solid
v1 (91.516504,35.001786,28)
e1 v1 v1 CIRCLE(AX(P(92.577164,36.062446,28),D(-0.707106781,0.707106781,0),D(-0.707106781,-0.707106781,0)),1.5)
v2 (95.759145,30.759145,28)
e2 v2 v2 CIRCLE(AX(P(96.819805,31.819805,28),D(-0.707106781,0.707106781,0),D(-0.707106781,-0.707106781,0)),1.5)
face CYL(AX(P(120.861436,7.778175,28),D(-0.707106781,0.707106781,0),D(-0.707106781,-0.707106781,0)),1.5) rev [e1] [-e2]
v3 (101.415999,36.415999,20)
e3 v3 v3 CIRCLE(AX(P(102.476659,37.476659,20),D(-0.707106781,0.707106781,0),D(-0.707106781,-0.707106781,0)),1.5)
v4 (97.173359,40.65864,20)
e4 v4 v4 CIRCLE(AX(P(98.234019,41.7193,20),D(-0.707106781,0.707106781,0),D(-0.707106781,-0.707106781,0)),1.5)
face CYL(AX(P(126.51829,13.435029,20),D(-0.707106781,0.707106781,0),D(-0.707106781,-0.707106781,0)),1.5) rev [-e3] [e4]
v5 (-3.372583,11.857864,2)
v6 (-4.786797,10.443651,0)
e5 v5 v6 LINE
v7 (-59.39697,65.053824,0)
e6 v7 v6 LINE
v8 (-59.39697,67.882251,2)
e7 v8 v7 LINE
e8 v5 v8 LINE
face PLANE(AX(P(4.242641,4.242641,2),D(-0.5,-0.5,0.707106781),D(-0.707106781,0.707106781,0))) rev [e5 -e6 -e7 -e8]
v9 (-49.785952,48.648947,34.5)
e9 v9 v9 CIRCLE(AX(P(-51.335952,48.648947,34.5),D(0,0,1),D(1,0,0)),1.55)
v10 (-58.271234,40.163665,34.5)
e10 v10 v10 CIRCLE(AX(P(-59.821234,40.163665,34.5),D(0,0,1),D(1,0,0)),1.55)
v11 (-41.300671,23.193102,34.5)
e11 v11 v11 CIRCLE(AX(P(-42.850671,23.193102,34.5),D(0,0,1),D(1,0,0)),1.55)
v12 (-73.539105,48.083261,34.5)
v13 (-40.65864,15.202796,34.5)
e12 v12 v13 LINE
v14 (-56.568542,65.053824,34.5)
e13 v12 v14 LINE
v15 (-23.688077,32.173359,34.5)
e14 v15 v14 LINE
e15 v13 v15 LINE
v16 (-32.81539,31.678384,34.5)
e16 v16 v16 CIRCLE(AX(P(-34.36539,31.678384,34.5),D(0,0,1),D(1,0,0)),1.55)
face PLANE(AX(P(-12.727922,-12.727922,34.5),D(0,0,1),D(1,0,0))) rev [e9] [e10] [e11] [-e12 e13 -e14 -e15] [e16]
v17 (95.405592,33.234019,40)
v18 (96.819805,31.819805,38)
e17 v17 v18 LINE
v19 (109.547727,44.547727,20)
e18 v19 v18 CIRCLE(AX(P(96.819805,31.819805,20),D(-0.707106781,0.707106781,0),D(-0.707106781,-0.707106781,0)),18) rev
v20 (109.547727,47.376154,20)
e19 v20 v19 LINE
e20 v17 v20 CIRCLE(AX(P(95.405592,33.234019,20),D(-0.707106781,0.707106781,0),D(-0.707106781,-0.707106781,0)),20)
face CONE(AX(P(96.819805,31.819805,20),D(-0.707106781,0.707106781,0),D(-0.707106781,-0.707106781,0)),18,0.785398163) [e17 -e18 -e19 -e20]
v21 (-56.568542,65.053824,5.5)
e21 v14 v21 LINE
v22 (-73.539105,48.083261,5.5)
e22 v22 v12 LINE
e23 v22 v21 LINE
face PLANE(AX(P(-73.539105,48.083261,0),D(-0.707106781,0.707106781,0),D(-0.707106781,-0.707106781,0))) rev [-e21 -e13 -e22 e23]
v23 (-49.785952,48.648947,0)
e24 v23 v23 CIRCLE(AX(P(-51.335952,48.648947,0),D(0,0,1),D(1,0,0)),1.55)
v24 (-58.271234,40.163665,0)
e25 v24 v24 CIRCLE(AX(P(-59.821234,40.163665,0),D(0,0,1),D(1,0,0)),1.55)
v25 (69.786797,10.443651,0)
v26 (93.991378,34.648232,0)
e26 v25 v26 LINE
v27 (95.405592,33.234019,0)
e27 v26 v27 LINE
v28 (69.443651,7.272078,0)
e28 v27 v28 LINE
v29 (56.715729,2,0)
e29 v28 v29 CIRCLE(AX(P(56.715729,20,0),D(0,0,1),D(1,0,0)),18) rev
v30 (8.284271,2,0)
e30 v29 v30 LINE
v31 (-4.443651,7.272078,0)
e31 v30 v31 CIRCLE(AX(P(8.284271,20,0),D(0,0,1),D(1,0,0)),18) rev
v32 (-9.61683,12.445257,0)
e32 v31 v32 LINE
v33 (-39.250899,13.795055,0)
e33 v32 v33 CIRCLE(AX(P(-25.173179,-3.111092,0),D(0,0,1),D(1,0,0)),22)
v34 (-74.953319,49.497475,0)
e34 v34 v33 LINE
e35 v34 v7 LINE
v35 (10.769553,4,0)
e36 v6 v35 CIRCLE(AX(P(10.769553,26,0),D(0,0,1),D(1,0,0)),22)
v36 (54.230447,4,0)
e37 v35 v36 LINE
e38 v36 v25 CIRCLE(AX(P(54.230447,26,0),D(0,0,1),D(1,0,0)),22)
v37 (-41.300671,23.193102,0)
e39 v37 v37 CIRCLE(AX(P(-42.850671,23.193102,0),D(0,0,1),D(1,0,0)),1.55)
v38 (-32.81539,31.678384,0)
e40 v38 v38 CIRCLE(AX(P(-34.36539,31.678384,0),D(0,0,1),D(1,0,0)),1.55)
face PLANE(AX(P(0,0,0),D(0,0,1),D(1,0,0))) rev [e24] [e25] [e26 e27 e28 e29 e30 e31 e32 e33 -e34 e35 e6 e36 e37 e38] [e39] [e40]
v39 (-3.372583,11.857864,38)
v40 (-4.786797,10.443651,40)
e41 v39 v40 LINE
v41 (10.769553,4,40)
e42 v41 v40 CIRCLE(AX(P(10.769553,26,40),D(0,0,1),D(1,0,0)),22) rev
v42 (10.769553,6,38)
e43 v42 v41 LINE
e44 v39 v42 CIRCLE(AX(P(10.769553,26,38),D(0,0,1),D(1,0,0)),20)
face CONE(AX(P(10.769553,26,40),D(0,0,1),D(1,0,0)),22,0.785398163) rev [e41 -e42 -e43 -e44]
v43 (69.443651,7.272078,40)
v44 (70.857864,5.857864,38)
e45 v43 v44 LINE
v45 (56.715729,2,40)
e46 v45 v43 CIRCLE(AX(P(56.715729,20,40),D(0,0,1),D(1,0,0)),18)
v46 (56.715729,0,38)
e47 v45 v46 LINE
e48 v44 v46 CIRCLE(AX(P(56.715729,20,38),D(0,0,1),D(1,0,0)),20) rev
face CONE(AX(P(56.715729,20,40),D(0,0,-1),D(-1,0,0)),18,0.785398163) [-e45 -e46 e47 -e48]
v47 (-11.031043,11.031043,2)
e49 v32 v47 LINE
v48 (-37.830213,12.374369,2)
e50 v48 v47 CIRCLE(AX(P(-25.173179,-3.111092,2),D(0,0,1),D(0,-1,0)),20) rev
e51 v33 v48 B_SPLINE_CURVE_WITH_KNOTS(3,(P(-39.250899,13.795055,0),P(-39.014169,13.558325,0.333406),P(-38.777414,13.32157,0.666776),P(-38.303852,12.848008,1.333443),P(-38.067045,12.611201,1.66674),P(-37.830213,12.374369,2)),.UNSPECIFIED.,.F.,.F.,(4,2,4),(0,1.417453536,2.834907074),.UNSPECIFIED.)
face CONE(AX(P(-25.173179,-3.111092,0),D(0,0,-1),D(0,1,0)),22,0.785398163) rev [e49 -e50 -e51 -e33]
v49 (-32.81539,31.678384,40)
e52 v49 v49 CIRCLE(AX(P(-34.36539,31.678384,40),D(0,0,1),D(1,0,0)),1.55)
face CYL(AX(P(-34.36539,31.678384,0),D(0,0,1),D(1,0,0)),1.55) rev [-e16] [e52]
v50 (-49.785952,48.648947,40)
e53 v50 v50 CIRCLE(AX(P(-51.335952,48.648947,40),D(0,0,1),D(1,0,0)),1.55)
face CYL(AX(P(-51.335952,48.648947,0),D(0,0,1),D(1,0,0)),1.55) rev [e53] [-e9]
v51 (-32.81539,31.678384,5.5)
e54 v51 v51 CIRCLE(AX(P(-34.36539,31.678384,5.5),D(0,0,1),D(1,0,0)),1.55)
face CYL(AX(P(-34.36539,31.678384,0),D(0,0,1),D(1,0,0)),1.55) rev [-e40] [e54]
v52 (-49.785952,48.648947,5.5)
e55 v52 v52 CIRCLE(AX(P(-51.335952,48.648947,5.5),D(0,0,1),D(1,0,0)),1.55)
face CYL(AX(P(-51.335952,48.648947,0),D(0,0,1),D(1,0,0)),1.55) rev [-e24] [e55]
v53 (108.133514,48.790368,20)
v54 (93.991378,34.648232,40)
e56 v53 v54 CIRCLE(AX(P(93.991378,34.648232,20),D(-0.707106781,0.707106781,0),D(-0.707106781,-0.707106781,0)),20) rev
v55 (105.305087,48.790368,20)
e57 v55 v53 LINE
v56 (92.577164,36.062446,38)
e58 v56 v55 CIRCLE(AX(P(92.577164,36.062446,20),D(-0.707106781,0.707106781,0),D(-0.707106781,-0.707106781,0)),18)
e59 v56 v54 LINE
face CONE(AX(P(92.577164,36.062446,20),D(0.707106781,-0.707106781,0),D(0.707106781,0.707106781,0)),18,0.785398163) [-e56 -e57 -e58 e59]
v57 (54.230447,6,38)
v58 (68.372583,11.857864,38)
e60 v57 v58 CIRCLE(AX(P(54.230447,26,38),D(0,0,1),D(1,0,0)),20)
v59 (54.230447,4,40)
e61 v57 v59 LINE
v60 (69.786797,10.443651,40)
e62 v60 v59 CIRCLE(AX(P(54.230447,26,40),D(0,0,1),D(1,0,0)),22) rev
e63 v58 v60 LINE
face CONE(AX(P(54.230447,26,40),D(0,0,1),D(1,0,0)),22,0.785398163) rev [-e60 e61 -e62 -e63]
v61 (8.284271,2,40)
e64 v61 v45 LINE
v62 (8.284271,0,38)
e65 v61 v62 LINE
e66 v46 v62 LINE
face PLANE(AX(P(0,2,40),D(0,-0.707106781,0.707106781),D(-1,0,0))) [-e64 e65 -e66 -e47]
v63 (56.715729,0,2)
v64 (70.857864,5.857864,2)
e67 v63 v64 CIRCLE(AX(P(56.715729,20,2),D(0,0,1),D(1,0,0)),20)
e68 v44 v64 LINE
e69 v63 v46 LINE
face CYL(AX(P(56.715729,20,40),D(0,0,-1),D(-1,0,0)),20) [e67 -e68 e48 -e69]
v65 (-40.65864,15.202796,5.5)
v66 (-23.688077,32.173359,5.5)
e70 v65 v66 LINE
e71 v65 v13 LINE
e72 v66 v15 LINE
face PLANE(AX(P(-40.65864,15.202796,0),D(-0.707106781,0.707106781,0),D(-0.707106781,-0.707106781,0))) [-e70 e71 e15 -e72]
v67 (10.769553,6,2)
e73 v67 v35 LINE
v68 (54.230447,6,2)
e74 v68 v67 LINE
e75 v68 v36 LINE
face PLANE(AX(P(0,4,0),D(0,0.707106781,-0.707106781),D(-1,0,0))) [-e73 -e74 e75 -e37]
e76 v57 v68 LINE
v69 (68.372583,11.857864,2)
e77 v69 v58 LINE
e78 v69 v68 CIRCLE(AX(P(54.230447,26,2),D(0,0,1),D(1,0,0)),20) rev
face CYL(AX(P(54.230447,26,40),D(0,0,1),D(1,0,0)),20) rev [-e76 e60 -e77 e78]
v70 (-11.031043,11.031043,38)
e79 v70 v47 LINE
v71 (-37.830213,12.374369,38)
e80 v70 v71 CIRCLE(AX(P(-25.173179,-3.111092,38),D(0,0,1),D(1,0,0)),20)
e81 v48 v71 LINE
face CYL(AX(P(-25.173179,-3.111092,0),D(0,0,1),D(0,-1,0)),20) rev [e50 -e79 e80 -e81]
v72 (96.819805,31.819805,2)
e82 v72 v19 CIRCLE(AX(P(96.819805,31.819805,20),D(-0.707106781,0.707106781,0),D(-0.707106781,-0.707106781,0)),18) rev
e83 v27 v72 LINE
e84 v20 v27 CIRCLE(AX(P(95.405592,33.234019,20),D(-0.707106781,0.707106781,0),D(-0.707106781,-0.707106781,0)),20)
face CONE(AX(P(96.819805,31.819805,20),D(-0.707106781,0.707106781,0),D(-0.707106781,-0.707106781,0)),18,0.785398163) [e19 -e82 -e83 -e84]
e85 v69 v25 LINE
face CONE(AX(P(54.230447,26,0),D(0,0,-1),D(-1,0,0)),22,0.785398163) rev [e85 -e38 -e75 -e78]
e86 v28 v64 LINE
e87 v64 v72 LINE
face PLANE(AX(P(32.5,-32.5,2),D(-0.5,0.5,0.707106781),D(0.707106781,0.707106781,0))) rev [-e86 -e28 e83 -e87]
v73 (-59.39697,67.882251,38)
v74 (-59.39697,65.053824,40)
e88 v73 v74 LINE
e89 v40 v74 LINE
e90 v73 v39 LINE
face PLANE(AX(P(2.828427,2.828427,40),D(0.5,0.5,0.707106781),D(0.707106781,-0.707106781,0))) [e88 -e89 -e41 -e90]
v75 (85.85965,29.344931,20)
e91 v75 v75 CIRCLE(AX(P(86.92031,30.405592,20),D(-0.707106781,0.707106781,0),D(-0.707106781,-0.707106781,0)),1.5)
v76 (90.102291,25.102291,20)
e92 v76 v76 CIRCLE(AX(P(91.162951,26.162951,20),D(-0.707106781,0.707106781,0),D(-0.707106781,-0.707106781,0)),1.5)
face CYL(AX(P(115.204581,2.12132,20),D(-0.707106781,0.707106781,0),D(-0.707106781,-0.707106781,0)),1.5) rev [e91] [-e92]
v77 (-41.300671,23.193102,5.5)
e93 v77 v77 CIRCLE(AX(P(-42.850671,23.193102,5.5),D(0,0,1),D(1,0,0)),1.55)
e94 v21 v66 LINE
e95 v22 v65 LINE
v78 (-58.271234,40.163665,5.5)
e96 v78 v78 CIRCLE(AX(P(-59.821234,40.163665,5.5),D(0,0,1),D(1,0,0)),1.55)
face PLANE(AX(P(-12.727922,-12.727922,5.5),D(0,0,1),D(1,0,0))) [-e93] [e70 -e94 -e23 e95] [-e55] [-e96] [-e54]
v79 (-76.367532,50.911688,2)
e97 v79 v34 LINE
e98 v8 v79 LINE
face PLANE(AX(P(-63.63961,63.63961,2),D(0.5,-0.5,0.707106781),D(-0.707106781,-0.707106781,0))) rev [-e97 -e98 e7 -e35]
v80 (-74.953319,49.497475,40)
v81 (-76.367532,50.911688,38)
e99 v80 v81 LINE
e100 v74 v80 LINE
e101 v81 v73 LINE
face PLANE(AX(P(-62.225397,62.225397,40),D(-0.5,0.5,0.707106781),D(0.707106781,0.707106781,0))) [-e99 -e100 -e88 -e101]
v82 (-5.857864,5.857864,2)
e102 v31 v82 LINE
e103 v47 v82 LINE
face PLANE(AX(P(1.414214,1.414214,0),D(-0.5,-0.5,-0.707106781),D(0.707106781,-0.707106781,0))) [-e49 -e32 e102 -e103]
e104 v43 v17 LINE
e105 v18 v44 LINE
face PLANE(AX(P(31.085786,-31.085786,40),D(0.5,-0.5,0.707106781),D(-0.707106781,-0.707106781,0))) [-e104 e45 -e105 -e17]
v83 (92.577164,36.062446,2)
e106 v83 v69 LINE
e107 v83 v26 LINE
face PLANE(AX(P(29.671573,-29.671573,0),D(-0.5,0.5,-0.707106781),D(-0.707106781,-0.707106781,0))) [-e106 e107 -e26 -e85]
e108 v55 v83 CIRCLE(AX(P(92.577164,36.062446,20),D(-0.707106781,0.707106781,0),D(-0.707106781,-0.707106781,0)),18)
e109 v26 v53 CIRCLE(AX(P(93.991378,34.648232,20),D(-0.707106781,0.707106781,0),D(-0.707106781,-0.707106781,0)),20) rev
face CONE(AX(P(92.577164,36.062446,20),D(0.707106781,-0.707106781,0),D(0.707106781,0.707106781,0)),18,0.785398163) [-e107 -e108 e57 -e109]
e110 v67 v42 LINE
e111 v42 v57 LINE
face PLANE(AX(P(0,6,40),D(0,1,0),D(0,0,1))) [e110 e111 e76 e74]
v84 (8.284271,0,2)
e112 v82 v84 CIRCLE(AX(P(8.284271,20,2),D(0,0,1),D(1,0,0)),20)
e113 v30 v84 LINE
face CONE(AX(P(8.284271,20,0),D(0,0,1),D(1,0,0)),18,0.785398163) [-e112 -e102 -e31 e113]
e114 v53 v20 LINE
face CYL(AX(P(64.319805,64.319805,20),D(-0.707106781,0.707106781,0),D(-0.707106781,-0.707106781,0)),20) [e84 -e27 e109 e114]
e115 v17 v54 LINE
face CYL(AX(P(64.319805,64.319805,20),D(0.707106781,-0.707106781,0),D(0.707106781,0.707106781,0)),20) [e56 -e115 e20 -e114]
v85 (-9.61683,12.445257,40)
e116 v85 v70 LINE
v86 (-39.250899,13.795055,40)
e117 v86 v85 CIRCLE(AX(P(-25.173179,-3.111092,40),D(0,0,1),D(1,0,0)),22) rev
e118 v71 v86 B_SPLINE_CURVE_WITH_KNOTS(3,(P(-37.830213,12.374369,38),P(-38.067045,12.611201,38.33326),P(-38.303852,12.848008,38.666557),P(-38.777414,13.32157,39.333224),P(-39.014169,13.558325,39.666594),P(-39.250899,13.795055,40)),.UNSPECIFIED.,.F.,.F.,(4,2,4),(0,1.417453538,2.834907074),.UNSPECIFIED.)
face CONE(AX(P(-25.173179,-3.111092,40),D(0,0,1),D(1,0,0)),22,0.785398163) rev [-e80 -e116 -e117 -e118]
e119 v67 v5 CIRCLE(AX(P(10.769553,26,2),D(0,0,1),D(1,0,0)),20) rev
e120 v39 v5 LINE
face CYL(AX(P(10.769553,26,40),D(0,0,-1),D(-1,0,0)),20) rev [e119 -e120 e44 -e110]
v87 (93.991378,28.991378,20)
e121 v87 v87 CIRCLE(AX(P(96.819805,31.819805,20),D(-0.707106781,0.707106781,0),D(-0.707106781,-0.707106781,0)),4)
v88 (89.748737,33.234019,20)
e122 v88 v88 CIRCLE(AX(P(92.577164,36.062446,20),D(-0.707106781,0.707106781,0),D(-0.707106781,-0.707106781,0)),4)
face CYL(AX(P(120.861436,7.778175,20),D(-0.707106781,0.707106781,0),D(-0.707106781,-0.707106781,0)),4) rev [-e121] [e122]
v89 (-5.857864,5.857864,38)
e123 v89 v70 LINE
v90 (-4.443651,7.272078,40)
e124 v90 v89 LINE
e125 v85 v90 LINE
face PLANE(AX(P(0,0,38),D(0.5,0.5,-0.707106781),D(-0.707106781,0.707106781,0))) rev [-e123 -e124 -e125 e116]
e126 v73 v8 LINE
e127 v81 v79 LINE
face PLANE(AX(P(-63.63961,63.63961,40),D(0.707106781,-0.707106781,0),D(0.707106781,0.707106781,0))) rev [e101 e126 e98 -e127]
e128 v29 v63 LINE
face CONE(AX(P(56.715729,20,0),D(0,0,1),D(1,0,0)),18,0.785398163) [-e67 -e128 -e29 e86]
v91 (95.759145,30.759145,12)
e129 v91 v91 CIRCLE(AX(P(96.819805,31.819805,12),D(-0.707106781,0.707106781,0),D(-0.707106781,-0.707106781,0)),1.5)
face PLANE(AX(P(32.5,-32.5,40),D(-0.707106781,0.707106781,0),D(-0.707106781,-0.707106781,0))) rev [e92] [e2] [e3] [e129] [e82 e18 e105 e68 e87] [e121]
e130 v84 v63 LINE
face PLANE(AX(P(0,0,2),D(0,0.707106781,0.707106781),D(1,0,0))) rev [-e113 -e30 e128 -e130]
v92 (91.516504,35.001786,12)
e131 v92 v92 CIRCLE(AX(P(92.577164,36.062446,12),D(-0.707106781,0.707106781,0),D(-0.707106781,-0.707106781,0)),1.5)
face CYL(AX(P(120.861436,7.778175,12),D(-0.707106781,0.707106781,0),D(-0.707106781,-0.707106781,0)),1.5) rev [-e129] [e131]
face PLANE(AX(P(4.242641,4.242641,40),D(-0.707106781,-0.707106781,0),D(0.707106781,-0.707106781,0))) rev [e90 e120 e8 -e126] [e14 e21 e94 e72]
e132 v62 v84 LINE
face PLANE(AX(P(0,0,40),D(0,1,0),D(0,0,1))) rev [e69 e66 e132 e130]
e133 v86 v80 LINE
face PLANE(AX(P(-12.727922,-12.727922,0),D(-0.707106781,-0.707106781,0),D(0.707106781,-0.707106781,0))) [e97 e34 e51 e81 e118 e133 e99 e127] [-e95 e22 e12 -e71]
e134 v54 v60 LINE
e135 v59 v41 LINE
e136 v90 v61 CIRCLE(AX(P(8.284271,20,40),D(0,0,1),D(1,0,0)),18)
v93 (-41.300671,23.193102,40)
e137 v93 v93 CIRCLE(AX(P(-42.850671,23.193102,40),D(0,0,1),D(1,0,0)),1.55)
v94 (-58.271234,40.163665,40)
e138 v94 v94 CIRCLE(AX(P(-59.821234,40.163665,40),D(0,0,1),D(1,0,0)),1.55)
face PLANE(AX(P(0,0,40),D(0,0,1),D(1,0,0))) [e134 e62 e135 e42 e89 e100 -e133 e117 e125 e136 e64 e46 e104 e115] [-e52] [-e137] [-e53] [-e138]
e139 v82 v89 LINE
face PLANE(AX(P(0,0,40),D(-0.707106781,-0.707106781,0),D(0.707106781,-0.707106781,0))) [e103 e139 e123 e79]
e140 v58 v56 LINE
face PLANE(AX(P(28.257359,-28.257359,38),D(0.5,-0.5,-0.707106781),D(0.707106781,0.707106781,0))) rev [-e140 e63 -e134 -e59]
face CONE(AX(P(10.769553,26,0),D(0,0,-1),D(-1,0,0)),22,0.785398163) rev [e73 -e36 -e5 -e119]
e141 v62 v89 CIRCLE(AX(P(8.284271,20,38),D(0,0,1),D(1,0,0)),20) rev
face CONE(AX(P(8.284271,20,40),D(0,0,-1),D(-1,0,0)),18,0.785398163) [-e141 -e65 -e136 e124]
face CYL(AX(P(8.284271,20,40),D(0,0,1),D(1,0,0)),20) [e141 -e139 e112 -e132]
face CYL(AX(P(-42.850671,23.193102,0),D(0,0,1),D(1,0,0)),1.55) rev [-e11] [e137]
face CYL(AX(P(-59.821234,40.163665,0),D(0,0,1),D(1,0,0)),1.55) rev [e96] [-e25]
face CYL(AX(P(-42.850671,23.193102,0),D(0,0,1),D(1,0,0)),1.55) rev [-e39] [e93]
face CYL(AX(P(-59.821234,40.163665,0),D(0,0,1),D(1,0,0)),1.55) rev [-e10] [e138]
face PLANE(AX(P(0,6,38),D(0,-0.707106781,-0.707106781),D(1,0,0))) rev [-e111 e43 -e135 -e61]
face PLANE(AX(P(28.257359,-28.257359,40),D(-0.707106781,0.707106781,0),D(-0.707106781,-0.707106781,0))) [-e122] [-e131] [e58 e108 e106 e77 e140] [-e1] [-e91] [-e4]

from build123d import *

# Parameters (mm, degrees)
BOSS_EXTRUDE1_DEPTH     = 40
SKETCH2_R               = 1.5
CUT_EXTRUDE1_DEPTH      = 40
SKETCH3_W               = 40
SKETCH3_H               = 54.5
SKETCH3_W_2             = 29
SKETCH3_H_2             = 46.5
BOSS_EXTRUDE2_DEPTH     = 18
SKETCH4_W               = 29
SKETCH4_H               = 46.5
CUT_EXTRUDE2_DEPTH      = 40
CUT_EXTRUDE3_DEPTH      = 137.090235877
CUT_EXTRUDE3_DEPTH_BACK = 137.090235877
SKETCH5_R               = 1.55
SKETCH5_R_2             = 1.05
FILLET1_R               = 20
FILLET2_R               = 20
FILLET3_R               = 20
CHAMFER1_SIZE           = 2


# Some blends are built 0.0001 mm under size
with BuildPart() as part:
    # Sketch1 → Boss-Extrude1 (new body)
    with BuildSketch(Plane.XY):
        Polygon((-63.639610307, 63.639610307), (0, 0), (0, 6), (2.485281374, 6), (-59.39696962, 67.882250994), align=None)
        Polygon((0, 6), (0, 0), (4.242640687, 4.242640687), (2.485281374, 6), align=None)
        Polygon((4.242640687, 4.242640687), (0, 0), (65, 0), (60.757359313, 4.242640687), (62.514718626, 6), (2.485281374, 6), align=None)
        Polygon((60.757359313, 4.242640687), (65, 0), (65, 6), (62.514718626, 6), align=None)
        Polygon((65, 6), (65, 0), (110.961940777, 45.961940777), (106.71930009, 50.204581464), (62.514718626, 6), align=None)
    extrude(amount=BOSS_EXTRUDE1_DEPTH)

    # Sketch2 → Cut-Extrude1 (cut)
    with BuildSketch(Plane(origin=(28.257359313, -28.257359313, 0), x_dir=(0, 0, 1), z_dir=(-0.7071067811865464, 0.7071067811865488, 0))):
        with Locations(Location((20, 82.961940777, 0), (0, 0, 270))):
            Circle(SKETCH2_R)
        with Locations(Location((12, 90.961940777, 0), (0, 0, 270))):
            Circle(SKETCH2_R)
        with BuildLine():
            ThreePointArc((24, 90.961940777), (21.530733729, 94.657458907), (17.171572875, 93.790367902))
            Line((17.171572875, 93.790367902), (22.828427125, 88.133513652))
            ThreePointArc((22.828427125, 88.133513652), (23.69551813, 89.431207048), (24, 90.961940777))
        make_face()
        with BuildLine():
            Line((22.828427125, 88.133513652), (17.171572875, 93.790367902))
            ThreePointArc((17.171572875, 93.790367902), (17.171572875, 88.133513652), (22.828427125, 88.133513652))
        make_face()
        with Locations(Location((20, 98.961940777, 0), (0, 0, 270))):
            Circle(SKETCH2_R)
        with Locations(Location((28, 90.961940777, 0), (0, 0, 270))):
            Circle(SKETCH2_R)
    extrude(amount=-CUT_EXTRUDE1_DEPTH, mode=Mode.SUBTRACT)

    # Sketch3 → Boss-Extrude2 (add)
    with BuildSketch(Plane(origin=(0, 0, 0), x_dir=(0, 0, 1), z_dir=(-0.7071067811865464, -0.7071067811865488, 0))):
        with Locations((20, 62.75)):
            Rectangle(SKETCH3_W, SKETCH3_H)
        with Locations((20, 62.75)):
            Rectangle(SKETCH3_W_2, SKETCH3_H_2, mode=Mode.SUBTRACT)
    extrude(amount=BOSS_EXTRUDE2_DEPTH)

    # Sketch4 → Cut-Extrude2 (cut)
    with BuildSketch(Plane(origin=(0, 0, 0), x_dir=(0, 0, 1), z_dir=(-0.7071067811865464, -0.7071067811865488, 0))):
        with Locations((20, 62.75)):
            Rectangle(SKETCH4_W, SKETCH4_H)
    extrude(amount=-CUT_EXTRUDE2_DEPTH, mode=Mode.SUBTRACT)

    # Sketch5 → Cut-Extrude3 (cut, two sides: drawn at the far end of the back side and taken through both)
    # profile 1 of 8: a face of its own
    with BuildSketch(Plane.XY.offset(40).offset(-CUT_EXTRUDE3_DEPTH_BACK)):
        with Locations((-51.335952314, 48.648946546)):
            Circle(SKETCH5_R)
        with Locations((-51.335952314, 48.648946546)):
            Circle(SKETCH5_R_2, mode=Mode.SUBTRACT)
    # profile 2 of 8: a face of its own
    with BuildSketch(Plane.XY.offset(40).offset(-CUT_EXTRUDE3_DEPTH_BACK)):
        with Locations((-51.335952314, 48.648946546)):
            Circle(SKETCH5_R_2)
    # profile 3 of 8: a face of its own
    with BuildSketch(Plane.XY.offset(40).offset(-CUT_EXTRUDE3_DEPTH_BACK)):
        with Locations((-59.821233688, 40.163665171)):
            Circle(SKETCH5_R)
        with Locations((-59.821233688, 40.163665171)):
            Circle(SKETCH5_R_2, mode=Mode.SUBTRACT)
    # profile 4 of 8: a face of its own
    with BuildSketch(Plane.XY.offset(40).offset(-CUT_EXTRUDE3_DEPTH_BACK)):
        with Locations((-59.821233688, 40.163665171)):
            Circle(SKETCH5_R_2)
    # profile 5 of 8: a face of its own
    with BuildSketch(Plane.XY.offset(40).offset(-CUT_EXTRUDE3_DEPTH_BACK)):
        with Locations((-34.365389566, 31.678383797)):
            Circle(SKETCH5_R)
        with Locations((-34.365389566, 31.678383797)):
            Circle(SKETCH5_R_2, mode=Mode.SUBTRACT)
    # profile 6 of 8: a face of its own
    with BuildSketch(Plane.XY.offset(40).offset(-CUT_EXTRUDE3_DEPTH_BACK)):
        with Locations((-34.365389566, 31.678383797)):
            Circle(SKETCH5_R_2)
    # profile 7 of 8: a face of its own
    with BuildSketch(Plane.XY.offset(40).offset(-CUT_EXTRUDE3_DEPTH_BACK)):
        with Locations((-42.85067094, 23.193102423)):
            Circle(SKETCH5_R)
        with Locations((-42.85067094, 23.193102423)):
            Circle(SKETCH5_R_2, mode=Mode.SUBTRACT)
    # profile 8 of 8: a face of its own
    with BuildSketch(Plane.XY.offset(40).offset(-CUT_EXTRUDE3_DEPTH_BACK)):
        with Locations((-42.85067094, 23.193102423)):
            Circle(SKETCH5_R_2)
    extrude(amount=CUT_EXTRUDE3_DEPTH + CUT_EXTRUDE3_DEPTH_BACK, mode=Mode.SUBTRACT)

    # Fillet1
    fillet1_edges = [part.edges().sort_by_distance(p)[0] for p in [
        (0, 0, 20),
        (2.485281374, 6, 20),
        (62.514718626, 6, 20),
        (65, 0, 20),
    ]]
    fillet(fillet1_edges, radius=FILLET1_R)

    # Fillet2
    # the kernel refuses this fillet: 20 mm, written as the material it adds along each edge
    with BuildSketch(Plane(origin=(-25.102290732, 25.102290732, 0), x_dir=(0.7071067811865487, -0.7071067811865465, 0), z_dir=(0, 0, 1))) as fillet2_piece_1:
        with BuildLine():
            CenterArc((19.899748742, -20), FILLET2_R, 90, 84.260829523)
            Line((0, -18), (-0.397994975, -17.96))
            ThreePointArc((-0.397994975, -17.96), (-0.4, -9), (-0.4, 0))
            Line((-0.4, 0), (0, 0.4))
            Line((0, 0.4), (19.899748742, 0.4))
            Line((19.899748742, 0.4), (19.899748742, 0))
        make_face()
    extrude(amount=40)

    # Fillet3
    fillet3_edges = [part.edges().sort_by_distance(p)[0] for p in [
        (108.840620434, 48.083261121, 0),
        (108.840620434, 48.083261121, 40),
    ]]
    fillet(fillet3_edges, radius=FILLET3_R - 0.0001)  # a hair under: the kernel refuses the full size

    # Chamfer1
    chamfer1_edges = [part.edges().sort_by_distance(p)[0] for p in [
        (-67.882250994, 59.39696962, 0),
        (32.5, 0, 0),
        (32.5, 0, 40),
        (-8.444453914, 8.444453914, 0),
        (-31.384776311, 39.870057685, 0),
        (32.5, 6, 0),
        (80.474909089, 23.960190464, 0),
        (83.83887012, 18.83887012, 0),
        (64.3693974, 1.52240935, 0),
        (0.6306026, 1.52240935, 0),
        (-8.444453914, 8.444453914, 40),
        (83.83887012, 18.83887012, 40),
        (80.474909089, 23.960190464, 40),
        (32.5, 6, 40),
        (-31.384776311, 39.870057685, 40),
        (64.3693974, 1.52240935, 40),
        (0.6306026, 1.52240935, 40),
        (3.115883974, 7.52240935, 0),
        (3.115883974, 7.52240935, 40),
        (61.884116026, 7.52240935, 0),
        (61.884116026, 7.52240935, 40),
        (-24.171923575, 16.863829291, 40),
        (-24.171923575, 16.863829291, 0),
        (106.819825864, 41.819825864, 34.142164913),
        (106.819825864, 41.819825864, 5.857835087),
        (102.577185177, 46.062466551, 34.142164913),
        (102.577185177, 46.062466551, 5.857835087),
        (-67.882250994, 59.39696962, 40),
    ]]
    chamfer(chamfer1_edges, length=CHAMFER1_SIZE)


solid = part.part
